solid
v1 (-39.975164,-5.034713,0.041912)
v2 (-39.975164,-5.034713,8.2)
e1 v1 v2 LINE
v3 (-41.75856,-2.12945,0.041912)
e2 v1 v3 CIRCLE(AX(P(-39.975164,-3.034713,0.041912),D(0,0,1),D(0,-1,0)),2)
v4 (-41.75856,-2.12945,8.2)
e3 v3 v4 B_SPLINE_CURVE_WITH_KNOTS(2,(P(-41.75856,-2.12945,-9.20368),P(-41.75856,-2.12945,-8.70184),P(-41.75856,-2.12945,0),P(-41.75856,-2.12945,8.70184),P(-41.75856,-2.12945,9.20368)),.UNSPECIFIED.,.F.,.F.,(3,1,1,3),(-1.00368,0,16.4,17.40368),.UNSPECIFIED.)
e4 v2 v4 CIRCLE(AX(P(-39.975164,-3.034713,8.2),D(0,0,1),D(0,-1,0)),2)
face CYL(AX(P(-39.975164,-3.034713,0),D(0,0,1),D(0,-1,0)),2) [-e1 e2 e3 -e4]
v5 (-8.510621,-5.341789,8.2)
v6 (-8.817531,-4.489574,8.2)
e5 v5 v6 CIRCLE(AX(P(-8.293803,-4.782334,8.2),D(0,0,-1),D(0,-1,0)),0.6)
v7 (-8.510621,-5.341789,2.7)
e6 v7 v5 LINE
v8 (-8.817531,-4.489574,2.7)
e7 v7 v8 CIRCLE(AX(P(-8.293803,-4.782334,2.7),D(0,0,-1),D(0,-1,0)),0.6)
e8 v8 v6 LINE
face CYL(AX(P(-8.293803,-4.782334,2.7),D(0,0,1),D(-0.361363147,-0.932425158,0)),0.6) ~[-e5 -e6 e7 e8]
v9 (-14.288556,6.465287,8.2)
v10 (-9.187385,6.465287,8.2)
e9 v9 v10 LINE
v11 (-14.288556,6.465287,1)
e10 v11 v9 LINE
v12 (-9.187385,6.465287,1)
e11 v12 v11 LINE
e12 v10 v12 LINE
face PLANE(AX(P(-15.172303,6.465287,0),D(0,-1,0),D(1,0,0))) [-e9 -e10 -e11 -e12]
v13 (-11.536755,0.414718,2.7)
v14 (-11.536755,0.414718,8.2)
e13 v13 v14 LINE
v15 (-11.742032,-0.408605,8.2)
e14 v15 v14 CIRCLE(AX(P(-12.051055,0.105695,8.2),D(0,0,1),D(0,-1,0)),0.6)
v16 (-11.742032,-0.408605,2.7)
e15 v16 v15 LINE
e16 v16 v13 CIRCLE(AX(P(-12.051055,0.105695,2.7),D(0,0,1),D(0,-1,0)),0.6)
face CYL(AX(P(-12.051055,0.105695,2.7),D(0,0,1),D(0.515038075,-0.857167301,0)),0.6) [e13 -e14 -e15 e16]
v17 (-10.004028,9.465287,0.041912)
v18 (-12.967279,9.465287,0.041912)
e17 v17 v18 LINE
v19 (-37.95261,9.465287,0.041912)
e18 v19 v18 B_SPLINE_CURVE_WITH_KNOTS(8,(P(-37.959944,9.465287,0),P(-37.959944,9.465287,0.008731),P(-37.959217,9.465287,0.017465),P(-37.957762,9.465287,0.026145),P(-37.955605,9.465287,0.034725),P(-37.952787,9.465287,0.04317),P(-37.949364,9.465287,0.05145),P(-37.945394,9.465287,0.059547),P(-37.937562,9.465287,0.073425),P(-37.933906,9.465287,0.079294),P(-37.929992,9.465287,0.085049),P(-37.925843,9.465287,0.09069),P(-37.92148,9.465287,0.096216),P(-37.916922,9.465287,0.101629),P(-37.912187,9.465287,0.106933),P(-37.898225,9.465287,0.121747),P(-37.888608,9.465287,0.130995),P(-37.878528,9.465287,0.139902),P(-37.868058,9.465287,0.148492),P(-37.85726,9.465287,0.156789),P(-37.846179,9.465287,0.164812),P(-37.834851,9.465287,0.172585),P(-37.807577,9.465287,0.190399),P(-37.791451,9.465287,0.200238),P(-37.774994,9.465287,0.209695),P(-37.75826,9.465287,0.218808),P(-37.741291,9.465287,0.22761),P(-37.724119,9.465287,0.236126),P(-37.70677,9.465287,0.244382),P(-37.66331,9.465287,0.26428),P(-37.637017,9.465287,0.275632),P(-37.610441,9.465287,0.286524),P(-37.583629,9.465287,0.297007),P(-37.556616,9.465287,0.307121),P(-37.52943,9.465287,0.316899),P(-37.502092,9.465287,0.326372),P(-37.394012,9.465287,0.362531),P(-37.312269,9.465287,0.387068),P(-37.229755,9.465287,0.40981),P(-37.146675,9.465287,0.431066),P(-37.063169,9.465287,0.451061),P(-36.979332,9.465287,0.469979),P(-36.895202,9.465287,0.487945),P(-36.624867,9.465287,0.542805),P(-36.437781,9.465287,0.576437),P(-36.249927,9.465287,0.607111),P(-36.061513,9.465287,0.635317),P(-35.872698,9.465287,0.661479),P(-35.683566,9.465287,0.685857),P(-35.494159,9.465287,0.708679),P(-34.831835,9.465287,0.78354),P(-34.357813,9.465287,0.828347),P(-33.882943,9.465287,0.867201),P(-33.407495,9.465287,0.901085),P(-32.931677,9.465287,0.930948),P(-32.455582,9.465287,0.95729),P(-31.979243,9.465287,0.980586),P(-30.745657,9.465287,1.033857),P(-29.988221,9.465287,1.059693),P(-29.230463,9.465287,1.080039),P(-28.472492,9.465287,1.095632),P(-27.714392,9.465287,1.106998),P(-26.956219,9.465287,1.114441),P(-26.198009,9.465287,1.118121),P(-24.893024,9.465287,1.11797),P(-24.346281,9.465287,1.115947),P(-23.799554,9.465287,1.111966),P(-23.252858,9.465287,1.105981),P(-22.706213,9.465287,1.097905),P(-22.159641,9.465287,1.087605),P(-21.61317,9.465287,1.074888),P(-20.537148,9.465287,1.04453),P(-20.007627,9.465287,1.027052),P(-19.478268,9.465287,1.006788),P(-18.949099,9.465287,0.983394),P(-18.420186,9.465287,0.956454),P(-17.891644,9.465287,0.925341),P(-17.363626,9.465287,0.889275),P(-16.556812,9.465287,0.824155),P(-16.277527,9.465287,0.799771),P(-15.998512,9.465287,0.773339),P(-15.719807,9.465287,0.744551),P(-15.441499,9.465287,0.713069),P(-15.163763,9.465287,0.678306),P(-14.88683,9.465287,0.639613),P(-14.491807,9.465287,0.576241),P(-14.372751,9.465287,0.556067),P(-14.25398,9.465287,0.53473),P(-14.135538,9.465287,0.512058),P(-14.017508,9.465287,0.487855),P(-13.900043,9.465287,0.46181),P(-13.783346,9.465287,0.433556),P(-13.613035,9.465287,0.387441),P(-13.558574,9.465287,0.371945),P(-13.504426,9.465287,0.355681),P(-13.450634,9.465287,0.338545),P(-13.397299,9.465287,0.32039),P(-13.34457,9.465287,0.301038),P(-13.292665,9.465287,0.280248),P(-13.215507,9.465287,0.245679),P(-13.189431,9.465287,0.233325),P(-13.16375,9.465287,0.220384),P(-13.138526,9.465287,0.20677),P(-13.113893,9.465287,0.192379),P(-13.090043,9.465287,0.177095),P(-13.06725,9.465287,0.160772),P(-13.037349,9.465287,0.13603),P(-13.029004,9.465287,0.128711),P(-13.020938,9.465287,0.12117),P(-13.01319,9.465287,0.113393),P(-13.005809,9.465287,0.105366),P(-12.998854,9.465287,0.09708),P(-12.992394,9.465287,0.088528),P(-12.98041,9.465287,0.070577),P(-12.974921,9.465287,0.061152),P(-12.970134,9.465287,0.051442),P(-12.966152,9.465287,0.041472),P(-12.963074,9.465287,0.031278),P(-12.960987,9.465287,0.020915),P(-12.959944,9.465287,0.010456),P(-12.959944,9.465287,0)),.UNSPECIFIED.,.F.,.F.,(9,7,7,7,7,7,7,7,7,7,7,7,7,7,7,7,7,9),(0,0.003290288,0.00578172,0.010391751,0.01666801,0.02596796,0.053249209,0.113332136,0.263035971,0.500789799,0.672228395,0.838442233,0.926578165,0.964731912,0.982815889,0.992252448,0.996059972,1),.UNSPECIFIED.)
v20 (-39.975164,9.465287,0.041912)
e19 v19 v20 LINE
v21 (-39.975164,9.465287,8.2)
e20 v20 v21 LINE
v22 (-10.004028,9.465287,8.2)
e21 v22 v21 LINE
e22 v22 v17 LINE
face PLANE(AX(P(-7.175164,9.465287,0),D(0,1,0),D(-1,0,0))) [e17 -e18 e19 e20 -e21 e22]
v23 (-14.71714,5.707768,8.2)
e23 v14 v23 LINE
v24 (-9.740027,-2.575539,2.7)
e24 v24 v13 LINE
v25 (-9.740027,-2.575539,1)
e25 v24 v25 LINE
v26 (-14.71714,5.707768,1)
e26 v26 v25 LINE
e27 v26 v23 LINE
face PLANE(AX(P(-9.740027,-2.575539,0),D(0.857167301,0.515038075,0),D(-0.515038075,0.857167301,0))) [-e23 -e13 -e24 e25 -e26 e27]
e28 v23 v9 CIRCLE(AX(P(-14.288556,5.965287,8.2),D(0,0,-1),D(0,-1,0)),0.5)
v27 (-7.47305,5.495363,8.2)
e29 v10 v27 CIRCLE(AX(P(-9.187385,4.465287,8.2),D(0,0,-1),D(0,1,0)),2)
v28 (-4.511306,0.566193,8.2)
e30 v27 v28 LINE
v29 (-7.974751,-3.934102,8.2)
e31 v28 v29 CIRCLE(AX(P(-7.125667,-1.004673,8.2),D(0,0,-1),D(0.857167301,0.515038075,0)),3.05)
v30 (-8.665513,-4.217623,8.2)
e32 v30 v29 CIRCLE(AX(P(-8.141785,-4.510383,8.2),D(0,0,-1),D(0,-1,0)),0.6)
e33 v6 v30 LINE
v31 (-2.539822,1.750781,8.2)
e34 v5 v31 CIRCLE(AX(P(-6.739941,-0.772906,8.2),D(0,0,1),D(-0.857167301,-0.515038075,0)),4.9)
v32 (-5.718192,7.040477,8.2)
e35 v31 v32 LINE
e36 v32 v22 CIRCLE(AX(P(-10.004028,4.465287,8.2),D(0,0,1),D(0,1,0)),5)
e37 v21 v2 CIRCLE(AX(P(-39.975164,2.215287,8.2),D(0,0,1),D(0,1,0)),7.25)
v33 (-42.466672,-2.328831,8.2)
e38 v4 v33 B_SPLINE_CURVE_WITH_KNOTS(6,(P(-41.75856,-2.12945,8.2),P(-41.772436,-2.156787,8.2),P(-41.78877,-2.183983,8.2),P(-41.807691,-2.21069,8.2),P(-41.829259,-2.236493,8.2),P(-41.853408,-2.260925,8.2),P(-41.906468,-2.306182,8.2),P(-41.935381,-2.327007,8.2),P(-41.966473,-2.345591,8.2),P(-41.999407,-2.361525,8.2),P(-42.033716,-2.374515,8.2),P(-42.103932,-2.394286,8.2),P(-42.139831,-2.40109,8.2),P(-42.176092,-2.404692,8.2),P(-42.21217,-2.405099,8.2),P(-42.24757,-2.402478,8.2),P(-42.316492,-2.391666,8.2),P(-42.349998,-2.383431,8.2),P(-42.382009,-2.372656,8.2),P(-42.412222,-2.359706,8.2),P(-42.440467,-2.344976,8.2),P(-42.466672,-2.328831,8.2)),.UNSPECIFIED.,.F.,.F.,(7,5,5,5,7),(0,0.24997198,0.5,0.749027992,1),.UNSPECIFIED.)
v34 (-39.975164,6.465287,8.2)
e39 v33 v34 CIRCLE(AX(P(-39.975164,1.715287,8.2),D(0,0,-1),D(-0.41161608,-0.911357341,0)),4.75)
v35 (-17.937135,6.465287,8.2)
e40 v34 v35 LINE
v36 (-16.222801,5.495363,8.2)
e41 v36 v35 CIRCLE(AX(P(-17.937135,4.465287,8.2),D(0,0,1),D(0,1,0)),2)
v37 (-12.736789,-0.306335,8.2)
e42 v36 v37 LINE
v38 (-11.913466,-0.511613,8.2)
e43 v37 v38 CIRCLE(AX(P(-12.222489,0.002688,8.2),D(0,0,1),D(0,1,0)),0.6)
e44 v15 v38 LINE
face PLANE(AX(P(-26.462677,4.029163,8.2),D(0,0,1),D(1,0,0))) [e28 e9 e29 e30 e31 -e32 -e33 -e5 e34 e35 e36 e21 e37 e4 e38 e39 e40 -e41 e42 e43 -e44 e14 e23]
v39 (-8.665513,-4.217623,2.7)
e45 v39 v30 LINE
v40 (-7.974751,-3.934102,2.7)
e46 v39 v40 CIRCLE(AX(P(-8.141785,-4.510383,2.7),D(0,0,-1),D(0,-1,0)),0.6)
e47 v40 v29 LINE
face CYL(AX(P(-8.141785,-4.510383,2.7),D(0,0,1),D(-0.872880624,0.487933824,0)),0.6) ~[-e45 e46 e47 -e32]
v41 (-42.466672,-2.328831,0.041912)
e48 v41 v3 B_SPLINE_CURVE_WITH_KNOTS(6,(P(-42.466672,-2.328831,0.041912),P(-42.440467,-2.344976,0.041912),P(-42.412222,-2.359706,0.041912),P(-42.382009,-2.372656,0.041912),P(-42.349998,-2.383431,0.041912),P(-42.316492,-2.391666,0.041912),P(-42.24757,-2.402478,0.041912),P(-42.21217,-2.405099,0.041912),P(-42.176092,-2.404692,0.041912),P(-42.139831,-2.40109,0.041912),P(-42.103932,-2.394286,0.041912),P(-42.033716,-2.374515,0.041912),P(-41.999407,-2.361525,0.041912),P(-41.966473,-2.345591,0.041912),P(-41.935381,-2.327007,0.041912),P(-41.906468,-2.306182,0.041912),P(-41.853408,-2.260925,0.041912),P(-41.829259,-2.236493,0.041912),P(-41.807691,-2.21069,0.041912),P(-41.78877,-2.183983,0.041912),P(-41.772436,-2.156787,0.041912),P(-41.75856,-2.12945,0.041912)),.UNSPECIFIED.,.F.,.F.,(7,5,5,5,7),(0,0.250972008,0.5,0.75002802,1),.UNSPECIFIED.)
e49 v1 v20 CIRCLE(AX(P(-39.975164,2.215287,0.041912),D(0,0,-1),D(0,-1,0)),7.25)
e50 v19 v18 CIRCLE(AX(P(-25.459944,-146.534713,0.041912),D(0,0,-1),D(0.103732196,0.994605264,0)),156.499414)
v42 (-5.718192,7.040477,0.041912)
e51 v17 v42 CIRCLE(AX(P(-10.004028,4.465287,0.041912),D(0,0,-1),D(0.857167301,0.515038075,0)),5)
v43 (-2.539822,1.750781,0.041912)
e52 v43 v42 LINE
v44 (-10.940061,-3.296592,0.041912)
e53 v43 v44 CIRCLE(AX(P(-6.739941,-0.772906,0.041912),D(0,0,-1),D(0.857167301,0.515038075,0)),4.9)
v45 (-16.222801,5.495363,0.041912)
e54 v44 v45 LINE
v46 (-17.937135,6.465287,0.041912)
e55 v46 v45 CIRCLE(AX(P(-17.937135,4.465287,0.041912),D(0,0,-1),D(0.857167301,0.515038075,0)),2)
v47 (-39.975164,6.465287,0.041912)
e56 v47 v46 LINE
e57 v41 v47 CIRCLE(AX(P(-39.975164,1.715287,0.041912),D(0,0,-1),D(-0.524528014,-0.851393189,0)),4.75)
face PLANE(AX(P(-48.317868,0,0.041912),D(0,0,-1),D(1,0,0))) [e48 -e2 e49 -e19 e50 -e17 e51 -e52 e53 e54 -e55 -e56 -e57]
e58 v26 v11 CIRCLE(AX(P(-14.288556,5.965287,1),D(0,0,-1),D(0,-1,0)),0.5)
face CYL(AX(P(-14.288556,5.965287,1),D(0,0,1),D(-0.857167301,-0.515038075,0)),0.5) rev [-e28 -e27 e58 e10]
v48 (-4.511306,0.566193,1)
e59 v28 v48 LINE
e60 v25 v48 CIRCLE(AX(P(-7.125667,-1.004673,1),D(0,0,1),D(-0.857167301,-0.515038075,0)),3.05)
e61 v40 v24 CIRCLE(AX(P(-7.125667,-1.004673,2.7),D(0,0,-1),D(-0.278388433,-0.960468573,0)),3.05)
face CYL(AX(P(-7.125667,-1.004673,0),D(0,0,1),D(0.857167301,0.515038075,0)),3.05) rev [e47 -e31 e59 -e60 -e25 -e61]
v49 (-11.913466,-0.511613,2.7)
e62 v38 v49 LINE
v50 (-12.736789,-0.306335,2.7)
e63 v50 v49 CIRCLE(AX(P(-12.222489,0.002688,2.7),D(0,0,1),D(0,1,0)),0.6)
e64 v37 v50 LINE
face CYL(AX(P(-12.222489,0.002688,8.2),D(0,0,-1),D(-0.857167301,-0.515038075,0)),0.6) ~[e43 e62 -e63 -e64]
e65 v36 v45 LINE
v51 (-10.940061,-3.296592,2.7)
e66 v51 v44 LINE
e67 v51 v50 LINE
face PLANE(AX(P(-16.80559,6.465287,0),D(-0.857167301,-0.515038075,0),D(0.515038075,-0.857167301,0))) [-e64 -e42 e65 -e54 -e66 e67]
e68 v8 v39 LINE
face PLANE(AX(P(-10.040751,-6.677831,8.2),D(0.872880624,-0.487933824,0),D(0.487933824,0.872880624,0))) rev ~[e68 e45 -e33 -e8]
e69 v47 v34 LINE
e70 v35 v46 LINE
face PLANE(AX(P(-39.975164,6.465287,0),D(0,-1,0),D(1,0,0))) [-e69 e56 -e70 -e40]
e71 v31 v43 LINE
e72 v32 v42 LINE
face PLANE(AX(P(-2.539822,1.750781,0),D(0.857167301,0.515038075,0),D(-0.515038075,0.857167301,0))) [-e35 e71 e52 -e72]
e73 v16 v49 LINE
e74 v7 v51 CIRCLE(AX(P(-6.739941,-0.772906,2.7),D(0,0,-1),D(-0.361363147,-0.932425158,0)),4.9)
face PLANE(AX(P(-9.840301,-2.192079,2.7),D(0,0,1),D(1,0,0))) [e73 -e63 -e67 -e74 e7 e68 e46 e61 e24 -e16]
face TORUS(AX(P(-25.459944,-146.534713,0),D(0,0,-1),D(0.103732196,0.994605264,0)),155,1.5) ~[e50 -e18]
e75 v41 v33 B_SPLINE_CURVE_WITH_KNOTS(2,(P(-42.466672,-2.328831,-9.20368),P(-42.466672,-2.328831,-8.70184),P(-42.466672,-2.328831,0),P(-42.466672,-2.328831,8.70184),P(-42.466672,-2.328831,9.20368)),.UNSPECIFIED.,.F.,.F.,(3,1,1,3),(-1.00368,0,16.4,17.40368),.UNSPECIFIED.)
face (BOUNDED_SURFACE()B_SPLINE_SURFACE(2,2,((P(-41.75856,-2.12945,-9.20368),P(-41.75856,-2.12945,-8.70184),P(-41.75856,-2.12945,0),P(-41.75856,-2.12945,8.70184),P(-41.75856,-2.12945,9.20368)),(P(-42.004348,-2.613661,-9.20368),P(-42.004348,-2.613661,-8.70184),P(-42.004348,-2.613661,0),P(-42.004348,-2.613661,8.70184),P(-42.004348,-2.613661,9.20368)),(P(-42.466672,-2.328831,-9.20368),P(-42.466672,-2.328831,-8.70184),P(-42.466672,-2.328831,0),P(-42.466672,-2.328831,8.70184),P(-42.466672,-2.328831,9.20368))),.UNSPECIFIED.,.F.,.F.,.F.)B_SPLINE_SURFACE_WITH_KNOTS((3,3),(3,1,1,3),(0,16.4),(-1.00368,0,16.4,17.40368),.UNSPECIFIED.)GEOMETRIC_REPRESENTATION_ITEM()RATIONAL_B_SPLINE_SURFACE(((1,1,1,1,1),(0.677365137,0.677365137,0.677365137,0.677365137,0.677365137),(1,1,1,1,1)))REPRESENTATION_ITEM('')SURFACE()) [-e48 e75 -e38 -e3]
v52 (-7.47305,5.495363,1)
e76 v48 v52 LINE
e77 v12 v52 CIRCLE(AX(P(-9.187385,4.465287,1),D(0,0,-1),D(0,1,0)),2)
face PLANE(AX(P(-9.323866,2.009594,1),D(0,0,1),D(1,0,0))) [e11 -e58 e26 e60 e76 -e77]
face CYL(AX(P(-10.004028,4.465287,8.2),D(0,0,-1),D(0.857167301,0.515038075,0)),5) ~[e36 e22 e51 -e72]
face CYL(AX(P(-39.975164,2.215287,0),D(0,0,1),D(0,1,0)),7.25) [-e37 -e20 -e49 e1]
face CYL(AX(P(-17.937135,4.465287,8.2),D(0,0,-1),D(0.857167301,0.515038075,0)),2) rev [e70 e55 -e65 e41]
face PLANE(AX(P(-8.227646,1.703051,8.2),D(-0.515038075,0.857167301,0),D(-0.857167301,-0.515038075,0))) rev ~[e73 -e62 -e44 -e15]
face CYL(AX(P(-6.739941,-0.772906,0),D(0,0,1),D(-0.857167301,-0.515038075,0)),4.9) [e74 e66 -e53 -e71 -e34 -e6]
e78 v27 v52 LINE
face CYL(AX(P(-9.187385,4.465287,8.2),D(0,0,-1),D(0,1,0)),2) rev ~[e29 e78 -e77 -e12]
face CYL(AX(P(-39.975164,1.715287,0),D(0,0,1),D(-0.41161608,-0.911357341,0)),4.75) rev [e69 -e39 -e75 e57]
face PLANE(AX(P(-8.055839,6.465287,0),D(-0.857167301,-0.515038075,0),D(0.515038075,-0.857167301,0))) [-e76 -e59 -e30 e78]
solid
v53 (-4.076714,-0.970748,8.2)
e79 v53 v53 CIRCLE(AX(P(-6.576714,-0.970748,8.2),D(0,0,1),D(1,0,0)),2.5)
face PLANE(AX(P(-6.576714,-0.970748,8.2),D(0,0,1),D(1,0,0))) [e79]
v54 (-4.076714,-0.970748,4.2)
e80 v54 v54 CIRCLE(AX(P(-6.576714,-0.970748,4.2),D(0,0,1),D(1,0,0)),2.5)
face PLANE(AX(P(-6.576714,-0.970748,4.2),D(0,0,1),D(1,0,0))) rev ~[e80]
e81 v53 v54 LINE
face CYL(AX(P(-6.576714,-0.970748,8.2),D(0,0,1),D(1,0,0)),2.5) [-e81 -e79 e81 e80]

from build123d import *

# Parameters (mm, degrees)
F1_DEPTH       = 8.2
F2_DEPTH       = 1
F4_DEPTH       = 5.5
F16_DEPTH      = 5.5
F5_R           = 2
F17_R          = 0.5
F18_R          = 2
F19_R          = 5
F20_R          = 0.5
F6_R           = 0.6
F8_DEPTH       = 1.5
F9_T4_ANGLE    = 11.9082557293
F10_T4_ANGLE   = 11.9082557293
F11_R          = 2.5
F12_DEPTH      = 4
F13_W          = 47.1088511404
F13_H          = 11.3580938778
F14_DEPTH      = 9.9662867391
F14_DEPTH_BACK = 5.6739057342


# Not quite as in the source:
# - a fillet or chamfer that OpenCascade refuses, or shapes differently, is made with other operations: its cross-section is extruded or revolved along the edge and cut away or added


with BuildPart() as f1:
    # F0 (on Top) → F1 (new body, symmetric)
    with BuildSketch(Plane.XY):
        with BuildLine():
            Line((-7.1751643711, 9.4652866391), (-39.9751643711, 9.4652866391))
            ThreePointArc((-39.9751643711, 9.4652866391), (-47.2251643711, 2.2152866391), (-39.9751643711, -5.0347133609))
            ThreePointArc((-39.9751643711, -5.0347133609), (-38.4191911607, -1.778151636), (-41.9303407523, -2.6136607293))
            ThreePointArc((-41.9303407523, -2.6136607293), (-44.6187082764, 2.7152866391), (-39.9751643711, 6.4652866391))
            Line((-39.9751643711, 6.4652866391), (-16.8055898067, 6.4652866391))
            Line((-16.8055898067, 6.4652866391), (-10.9400612438, -3.2965922013))
            ThreePointArc((-10.9400612438, -3.2965922013), (-4.2162549033, -4.9730254077), (-2.5398216969, 1.7507809328))
            Line((-2.5398216969, 1.7507809328), (-7.1751643711, 9.4652866391))
        make_face()
        with BuildLine():
            Line((-15.1723030506, 6.4652866391), (-8.0558393276, 6.4652866391))
            Line((-8.0558393276, 6.4652866391), (-4.5113064885, 0.5661933605))
            ThreePointArc((-4.5113064885, 0.5661933605), (-5.5548006272, -3.6190330351), (-9.7400270228, -2.5755388964))
            Line((-9.7400270228, -2.5755388964), (-15.1723030506, 6.4652866391))
        make_face(mode=Mode.SUBTRACT)
    extrude(amount=F1_DEPTH, both=True)

    # F0 (on Top) → F2 (join, symmetric)
    with BuildSketch(Plane.XY):
        with BuildLine():
            Line((-4.5113064885, 0.5661933605), (-8.0558393276, 6.4652866391))
            Line((-8.0558393276, 6.4652866391), (-15.1723030506, 6.4652866391))
            Line((-15.1723030506, 6.4652866391), (-9.7400270228, -2.5755388964))
            ThreePointArc((-9.7400270228, -2.5755388964), (-5.5548006272, -3.6190330351), (-4.5113064885, 0.5661933605))
        make_face()
    extrude(amount=F2_DEPTH, both=True)

    # F3 (on face) → F4 (cut)
    with BuildSketch(Plane.XY.offset(8.2)):
        Polygon((-10.0407510024, -6.6778307382), (-6.7399414704, -0.7729056342), (-8.2276463966, 1.7030511502), (-13.2597389706, -1.3205351088), align=None)
    extrude(amount=-F4_DEPTH, mode=Mode.SUBTRACT)

    # F15 (on face) → F16 (cut)
    with BuildSketch(Plane(origin=(0, 0, -8.2), x_dir=(1, 0, 0), z_dir=(0, 0, -1))):
        with BuildLine():
            Line((-12.42776617, 0.8206354168), (-11.227731949, 0.099582112))
            Line((-11.227731949, 0.099582112), (-9.7400270228, 2.5755388964))
            ThreePointArc((-9.7400270228, 2.5755388964), (-9.166526222, 3.2712544759), (-8.4146795695, 3.7688988741))
            Line((-8.4146795695, 3.7688988741), (-9.130817206, 5.0500206919))
            ThreePointArc((-9.130817206, 5.0500206919), (-10.1500636556, 4.2915796291), (-10.9400612438, 3.2965922013))
            Line((-10.9400612438, 3.2965922013), (-12.42776617, 0.8206354168))
        make_face()
    extrude(amount=-F16_DEPTH, mode=Mode.SUBTRACT)

    # F5
    f5_edges = [f1.edges().sort_by_distance(p)[0] for p in [
        (-16.80559, 6.465287, 0),
    ]]
    fillet(f5_edges, radius=F5_R)

    # F17
    f17_edges = [f1.edges().sort_by_distance(p)[0] for p in [
        (-15.172303, 6.465287, -4.6),
        (-15.172303, 6.465287, 4.6),
    ]]
    fillet(f17_edges, radius=F17_R)

    # F18
    f18_edges = [f1.edges().sort_by_distance(p)[0] for p in [
        (-8.055839, 6.465287, -4.6),
        (-8.055839, 6.465287, 4.6),
    ]]
    fillet(f18_edges, radius=F18_R)

    # F19
    f19_edges = [f1.edges().sort_by_distance(p)[0] for p in [
        (-7.175164, 9.465287, 0),
    ]]
    fillet(f19_edges, radius=F19_R)

    # F20
    f20_edges = [f1.edges().sort_by_distance(p)[0] for p in [
        (-41.930341, -2.613661, 0),
    ]]
    fillet(f20_edges, radius=F20_R)

    # F6
    f6_edges = [f1.edges().sort_by_distance(p)[0] for p in [
        (-12.427766, -0.820635, 5.45),
        (-11.227732, -0.099582, 5.45),
        (-8.41468, -3.768899, 5.45),
        (-9.130817, -5.050021, 5.45),
        (-9.130817, -5.050021, -5.45),
        (-8.41468, -3.768899, -5.45),
        (-12.427766, -0.820635, -5.45),
        (-11.227732, -0.099582, -5.45),
    ]]
    fillet(f6_edges, radius=F6_R)

    # F7 (on Top) → F8 (join, symmetric)
    with BuildSketch(Plane.XY):
        with BuildLine():
            ThreePointArc((-12.9599444568, 9.4652866391), (-25.4599444568, 9.9652866391), (-37.9599444568, 9.4652866391))
            Line((-37.9599444568, 9.4652866391), (-12.9599444568, 9.4652866391))
        make_face()
    extrude(amount=F8_DEPTH, both=True)

    # F9: fillet of radius 1.5 on 1 edges, made by hand


with BuildPart() as f9_tool2:
    # F9_s3 → F9_t4 (revolve)
    with BuildSketch(Plane(origin=(-10.0676204433, 1.0500008536, 0), x_dir=(0, 0, 1), z_dir=(0.9946052642, -0.1037321959, 0))):
        with BuildLine():
            ThreePointArc((1.5, -6.6147867599), (1.0606601718, -7.6754469317), (0, -8.1147867599))
            Line((0, -8.1147867599), (1.5, -8.1147867599))
            Line((1.5, -8.1147867599), (1.5, -6.6147867599))
        make_face()
    revolve(axis=Axis((-25.4599444568, -146.5347133609, 1.5), (0, 0, 1)), revolution_arc=F9_T4_ANGLE)

    split(bisect_by=Plane.XZ.offset(-9.4652866391), keep=Keep.BOTTOM)


with BuildPart() as f1_1:
    add(f1.part)

    # F9_t1: cut F9_tool2
    add(f9_tool2.part, mode=Mode.SUBTRACT)

    # F10: fillet of radius 1.5 on 1 edges, made by hand


with BuildPart() as f10_tool2:
    # F10_s3 → F10_t4 (revolve)
    with BuildSketch(Plane(origin=(-10.0676204433, 1.0500008536, 0), x_dir=(0, 0, 1), z_dir=(0.9946052642, -0.1037321959, 0))):
        with BuildLine():
            ThreePointArc((0, -8.1147867599), (-1.0606601718, -7.6754469317), (-1.5, -6.6147867599))
            Line((-1.5, -6.6147867599), (-1.5, -8.1147867599))
            Line((-1.5, -8.1147867599), (0, -8.1147867599))
        make_face()
    revolve(axis=Axis((-25.4599444568, -146.5347133609, -1.5), (0, 0, 1)), revolution_arc=F10_T4_ANGLE)

    split(bisect_by=Plane.XZ.offset(-9.4652866391), keep=Keep.BOTTOM)


with BuildPart() as f1_2:
    add(f1_1.part)

    # F10_t1: cut F10_tool2
    add(f10_tool2.part, mode=Mode.SUBTRACT)

    # F13 (on Front) → F14 (cut, two sides)
    with BuildSketch(Plane.XZ) as f14_sk:
        with Locations((-24.7634426923, -5.6371351529)):
            Rectangle(F13_W, F13_H)
    extrude(amount=-F14_DEPTH, mode=Mode.SUBTRACT)
    extrude(f14_sk.sketch, amount=F14_DEPTH_BACK, mode=Mode.SUBTRACT)


with BuildPart() as f12:
    # F11 (on face) → F12 (new body)
    with BuildSketch(Plane.XY.offset(8.2)):
        with Locations((-6.5767139877, -0.9707484622)):
            Circle(F11_R)
    extrude(amount=-F12_DEPTH)


solid = Compound([f1_2.part, f12.part])
